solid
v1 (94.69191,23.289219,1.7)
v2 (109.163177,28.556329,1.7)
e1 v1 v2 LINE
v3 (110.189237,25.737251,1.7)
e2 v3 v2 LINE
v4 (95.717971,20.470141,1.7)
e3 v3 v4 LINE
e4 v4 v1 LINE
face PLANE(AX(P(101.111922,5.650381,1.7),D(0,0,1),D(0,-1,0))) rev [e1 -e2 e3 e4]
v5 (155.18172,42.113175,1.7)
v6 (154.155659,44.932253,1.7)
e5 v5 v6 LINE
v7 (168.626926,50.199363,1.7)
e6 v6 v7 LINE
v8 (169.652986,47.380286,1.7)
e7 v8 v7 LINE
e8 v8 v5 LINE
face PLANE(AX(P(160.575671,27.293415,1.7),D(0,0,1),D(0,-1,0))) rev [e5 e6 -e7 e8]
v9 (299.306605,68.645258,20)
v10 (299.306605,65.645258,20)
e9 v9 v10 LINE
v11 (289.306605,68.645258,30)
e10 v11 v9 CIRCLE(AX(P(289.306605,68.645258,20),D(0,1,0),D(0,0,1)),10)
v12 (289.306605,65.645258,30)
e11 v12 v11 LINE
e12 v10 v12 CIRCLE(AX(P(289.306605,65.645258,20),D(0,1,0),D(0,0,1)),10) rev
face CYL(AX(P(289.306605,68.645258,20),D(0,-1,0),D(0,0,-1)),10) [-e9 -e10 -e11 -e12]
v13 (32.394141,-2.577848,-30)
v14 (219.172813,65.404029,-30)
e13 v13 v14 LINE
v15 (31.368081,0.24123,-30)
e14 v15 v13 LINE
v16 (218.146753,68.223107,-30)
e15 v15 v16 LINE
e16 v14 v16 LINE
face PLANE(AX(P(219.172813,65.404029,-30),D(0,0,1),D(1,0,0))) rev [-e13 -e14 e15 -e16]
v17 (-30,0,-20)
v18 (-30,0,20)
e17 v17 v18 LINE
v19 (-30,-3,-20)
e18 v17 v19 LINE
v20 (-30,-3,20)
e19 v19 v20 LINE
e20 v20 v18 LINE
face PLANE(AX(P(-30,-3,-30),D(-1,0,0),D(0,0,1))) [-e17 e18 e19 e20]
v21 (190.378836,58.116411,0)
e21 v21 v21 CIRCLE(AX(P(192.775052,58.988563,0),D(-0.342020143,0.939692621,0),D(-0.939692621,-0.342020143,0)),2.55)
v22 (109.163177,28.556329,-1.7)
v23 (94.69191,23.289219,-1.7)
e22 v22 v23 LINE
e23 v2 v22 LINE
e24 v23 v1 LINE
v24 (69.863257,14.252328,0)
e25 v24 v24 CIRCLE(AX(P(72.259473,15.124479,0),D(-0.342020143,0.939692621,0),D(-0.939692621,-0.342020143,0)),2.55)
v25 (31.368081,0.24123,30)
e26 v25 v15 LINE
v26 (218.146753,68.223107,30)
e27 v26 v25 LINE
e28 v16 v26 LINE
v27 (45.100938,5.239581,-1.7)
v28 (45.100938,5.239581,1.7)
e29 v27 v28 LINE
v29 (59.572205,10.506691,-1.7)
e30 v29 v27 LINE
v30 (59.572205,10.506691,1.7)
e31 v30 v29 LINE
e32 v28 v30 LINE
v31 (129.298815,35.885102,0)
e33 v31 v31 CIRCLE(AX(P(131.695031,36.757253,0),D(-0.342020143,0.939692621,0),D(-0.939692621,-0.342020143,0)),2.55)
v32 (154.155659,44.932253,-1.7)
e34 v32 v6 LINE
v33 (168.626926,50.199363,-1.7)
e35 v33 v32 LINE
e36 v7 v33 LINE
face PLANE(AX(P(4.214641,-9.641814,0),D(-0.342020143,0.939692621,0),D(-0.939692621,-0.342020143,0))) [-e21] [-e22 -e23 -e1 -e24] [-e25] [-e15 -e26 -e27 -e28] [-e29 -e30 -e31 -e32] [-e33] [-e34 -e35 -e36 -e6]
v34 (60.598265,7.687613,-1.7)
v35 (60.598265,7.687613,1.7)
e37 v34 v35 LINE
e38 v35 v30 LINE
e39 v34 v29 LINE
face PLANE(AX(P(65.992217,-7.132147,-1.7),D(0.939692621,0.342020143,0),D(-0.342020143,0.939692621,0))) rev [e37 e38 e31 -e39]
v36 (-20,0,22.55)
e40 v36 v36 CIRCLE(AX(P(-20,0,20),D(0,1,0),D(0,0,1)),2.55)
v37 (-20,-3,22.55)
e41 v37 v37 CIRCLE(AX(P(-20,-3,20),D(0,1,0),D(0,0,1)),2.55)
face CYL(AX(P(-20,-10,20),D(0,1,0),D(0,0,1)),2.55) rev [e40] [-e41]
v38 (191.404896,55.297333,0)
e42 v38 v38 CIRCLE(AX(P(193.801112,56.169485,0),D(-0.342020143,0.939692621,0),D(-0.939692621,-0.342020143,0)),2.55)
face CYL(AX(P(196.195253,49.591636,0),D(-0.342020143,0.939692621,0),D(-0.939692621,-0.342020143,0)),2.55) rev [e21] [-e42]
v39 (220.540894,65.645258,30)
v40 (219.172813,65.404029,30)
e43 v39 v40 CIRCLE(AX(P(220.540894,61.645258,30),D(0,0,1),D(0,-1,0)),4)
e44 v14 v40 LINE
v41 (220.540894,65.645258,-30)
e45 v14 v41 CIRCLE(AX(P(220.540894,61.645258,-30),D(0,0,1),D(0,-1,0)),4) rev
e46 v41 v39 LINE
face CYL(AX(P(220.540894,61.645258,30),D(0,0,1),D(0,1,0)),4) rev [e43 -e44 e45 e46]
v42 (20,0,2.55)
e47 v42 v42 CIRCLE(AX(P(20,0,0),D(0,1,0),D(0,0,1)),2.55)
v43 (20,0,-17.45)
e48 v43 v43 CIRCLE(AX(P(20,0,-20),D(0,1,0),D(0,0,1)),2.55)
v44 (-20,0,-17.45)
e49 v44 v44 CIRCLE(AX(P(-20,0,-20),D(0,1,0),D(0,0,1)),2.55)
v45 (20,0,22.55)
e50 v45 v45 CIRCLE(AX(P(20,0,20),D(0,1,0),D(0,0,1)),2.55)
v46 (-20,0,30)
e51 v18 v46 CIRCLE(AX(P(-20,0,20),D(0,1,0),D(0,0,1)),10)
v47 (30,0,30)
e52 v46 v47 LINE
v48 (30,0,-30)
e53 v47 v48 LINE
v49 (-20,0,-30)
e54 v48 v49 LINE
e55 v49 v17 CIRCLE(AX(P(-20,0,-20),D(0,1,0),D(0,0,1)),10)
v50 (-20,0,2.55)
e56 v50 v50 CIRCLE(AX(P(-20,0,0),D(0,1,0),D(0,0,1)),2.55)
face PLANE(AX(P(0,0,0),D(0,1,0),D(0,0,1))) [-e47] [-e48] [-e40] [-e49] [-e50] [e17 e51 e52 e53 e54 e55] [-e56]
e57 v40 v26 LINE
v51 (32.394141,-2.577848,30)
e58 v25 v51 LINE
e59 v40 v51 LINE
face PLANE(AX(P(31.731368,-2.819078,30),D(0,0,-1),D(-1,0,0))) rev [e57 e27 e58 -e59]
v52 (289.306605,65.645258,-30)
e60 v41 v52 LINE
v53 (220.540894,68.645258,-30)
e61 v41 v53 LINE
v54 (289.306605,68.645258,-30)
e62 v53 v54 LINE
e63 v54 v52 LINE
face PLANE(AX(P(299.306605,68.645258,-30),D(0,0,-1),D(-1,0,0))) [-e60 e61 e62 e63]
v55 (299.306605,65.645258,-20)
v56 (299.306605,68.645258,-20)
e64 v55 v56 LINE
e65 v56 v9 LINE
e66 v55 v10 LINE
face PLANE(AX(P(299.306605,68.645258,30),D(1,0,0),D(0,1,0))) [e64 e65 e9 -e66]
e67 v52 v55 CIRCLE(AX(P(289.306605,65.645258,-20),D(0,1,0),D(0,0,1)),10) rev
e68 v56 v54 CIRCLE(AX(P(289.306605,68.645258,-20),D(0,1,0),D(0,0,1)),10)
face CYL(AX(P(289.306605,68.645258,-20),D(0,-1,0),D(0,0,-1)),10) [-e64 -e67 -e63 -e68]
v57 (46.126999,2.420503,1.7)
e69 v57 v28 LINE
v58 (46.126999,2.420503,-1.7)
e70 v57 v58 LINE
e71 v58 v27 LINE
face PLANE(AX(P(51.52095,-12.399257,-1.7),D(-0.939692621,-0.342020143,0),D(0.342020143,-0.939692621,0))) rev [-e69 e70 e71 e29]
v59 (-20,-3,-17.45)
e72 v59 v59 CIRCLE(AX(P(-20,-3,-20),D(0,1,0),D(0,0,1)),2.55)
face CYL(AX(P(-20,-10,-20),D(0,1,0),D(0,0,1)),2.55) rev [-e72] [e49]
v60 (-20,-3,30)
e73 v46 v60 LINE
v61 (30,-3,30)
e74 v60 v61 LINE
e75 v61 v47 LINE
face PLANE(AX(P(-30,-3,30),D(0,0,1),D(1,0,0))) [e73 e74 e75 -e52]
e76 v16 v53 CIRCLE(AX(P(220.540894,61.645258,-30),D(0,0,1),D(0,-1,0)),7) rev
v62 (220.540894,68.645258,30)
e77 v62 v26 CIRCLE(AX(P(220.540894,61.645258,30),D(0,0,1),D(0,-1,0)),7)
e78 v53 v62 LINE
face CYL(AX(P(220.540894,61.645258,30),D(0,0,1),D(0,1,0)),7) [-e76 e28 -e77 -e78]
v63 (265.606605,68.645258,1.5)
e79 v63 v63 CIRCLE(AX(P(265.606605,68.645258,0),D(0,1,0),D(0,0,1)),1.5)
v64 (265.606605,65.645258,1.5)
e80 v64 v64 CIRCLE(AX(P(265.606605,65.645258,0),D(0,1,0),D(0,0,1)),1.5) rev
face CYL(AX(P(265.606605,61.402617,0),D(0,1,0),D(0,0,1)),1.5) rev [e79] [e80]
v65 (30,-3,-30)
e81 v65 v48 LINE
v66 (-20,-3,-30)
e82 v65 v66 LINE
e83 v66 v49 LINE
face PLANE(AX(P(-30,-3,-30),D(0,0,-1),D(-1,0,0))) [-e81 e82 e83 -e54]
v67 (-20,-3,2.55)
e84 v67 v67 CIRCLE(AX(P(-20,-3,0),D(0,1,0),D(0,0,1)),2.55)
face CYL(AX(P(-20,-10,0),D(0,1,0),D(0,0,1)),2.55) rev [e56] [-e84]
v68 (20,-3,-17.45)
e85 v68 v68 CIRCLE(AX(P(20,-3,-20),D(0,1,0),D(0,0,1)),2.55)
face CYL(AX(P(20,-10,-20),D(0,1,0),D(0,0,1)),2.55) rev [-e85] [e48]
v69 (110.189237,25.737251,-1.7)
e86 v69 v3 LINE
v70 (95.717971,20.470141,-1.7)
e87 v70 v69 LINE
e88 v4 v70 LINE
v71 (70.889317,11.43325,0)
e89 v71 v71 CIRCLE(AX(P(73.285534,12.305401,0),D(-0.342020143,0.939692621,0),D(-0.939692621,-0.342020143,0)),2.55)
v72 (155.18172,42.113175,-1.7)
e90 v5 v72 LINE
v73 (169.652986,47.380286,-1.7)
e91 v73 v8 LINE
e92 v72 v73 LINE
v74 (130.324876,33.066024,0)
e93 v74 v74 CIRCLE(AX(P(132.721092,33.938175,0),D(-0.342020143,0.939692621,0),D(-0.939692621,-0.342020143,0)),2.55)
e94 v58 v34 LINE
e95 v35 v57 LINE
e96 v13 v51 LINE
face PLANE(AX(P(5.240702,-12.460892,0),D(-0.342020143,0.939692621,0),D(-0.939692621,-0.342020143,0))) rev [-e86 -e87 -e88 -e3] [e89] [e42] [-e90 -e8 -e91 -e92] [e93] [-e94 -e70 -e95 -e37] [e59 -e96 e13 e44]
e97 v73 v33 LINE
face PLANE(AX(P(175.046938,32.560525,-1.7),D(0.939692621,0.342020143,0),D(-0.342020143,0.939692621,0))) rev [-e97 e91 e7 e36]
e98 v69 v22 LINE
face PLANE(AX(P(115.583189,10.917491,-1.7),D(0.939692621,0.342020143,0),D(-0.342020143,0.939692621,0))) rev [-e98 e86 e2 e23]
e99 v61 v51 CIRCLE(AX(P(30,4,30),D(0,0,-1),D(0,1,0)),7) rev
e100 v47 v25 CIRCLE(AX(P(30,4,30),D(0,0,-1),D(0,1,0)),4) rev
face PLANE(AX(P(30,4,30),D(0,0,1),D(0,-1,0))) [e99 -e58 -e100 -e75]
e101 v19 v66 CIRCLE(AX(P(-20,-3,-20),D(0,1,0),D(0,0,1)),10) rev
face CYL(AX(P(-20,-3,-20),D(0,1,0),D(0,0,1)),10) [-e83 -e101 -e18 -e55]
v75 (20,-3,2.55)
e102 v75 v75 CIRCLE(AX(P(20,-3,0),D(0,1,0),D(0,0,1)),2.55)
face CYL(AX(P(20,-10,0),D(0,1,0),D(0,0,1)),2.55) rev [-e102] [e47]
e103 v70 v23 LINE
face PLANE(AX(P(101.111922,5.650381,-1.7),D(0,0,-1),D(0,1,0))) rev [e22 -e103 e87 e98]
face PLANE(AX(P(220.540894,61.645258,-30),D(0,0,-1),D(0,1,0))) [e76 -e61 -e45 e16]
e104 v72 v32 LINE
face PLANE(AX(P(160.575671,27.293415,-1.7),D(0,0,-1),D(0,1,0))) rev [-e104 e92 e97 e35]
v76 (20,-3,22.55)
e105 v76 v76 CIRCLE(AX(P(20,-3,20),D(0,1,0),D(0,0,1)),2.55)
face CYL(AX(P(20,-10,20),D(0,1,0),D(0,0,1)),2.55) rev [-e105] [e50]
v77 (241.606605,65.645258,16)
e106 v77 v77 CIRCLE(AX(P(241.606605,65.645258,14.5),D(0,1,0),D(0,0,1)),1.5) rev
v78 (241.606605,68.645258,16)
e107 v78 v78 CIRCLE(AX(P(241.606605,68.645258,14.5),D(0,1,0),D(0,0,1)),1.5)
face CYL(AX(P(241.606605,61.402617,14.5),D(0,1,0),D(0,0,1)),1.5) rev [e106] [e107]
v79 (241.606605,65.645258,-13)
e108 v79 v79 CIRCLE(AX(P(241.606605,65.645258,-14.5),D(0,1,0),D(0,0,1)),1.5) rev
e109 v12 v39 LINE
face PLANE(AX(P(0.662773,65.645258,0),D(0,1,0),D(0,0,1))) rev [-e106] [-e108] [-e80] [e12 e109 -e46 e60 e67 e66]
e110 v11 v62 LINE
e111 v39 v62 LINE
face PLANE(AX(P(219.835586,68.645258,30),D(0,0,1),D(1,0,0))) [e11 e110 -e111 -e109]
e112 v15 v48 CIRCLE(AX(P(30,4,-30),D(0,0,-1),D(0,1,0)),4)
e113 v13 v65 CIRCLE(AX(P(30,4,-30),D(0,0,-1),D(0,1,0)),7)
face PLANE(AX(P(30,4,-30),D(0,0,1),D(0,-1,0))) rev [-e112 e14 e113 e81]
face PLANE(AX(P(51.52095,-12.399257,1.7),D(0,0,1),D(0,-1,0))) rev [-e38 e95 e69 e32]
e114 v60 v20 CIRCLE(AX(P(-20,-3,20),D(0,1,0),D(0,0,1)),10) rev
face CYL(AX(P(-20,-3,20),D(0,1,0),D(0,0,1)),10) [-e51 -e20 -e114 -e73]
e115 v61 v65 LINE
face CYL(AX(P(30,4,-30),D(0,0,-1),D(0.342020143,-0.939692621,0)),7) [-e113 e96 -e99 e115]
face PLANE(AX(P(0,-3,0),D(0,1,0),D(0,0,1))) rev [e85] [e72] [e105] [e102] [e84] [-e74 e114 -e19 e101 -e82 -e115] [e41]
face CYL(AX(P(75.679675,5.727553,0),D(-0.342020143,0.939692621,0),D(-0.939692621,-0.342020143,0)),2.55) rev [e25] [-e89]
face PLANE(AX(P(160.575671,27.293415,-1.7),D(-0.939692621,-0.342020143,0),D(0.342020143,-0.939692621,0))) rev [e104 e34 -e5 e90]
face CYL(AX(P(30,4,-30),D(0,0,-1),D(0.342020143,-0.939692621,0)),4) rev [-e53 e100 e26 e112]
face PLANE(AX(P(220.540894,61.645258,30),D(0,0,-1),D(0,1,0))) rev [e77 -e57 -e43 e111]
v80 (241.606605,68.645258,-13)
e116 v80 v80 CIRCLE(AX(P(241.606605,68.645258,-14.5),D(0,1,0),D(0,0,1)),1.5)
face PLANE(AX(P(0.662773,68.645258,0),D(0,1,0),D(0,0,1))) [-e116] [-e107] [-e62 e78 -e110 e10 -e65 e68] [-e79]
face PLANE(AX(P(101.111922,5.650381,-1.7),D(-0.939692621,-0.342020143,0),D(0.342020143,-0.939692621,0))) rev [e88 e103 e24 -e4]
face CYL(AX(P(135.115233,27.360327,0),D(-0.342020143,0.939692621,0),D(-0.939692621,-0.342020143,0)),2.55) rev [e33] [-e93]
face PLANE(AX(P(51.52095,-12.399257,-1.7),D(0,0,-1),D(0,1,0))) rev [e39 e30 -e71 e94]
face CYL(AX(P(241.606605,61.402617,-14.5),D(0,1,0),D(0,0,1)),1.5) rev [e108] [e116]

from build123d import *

# Parameters (mm, degrees)
SKETCH1_W          = 60
SKETCH1_H          = 60
BASE_FLANGE1_DEPTH = 3
EDGE_FLANGE1_DEPTH = 60
EDGE_FLANGE2_DEPTH = 60
FILLET1_R          = 10
SKETCH12_R         = 2.55
CUT_EXTRUDE1_DEPTH = 10
CAVITY1_START      = -1.5
CAVITY1_DEPTH      = 3
SKETCH15_W         = 15.4
SKETCH15_H         = 3.400000894
SKETCH15_H_2       = 3.4
CUT_EXTRUDE3_DEPTH = 3
SKETCH16_R         = 1.5
CUT_EXTRUDE4_DEPTH = 3
SKETCH17_R         = 2.55
CUT_EXTRUDE5_DEPTH = 10


# Read off the part's stored shape, not the designer's step: Cavity1
# Sheet-metal steps are written as plain solids
with BuildPart() as part:
    # Sketch1 → Base-Flange1 (new body)
    with BuildSketch(Plane(origin=(0, 0, 0), x_dir=(1, 0, 0), z_dir=(0, 1, 0))):
        Rectangle(SKETCH1_W, SKETCH1_H)
    extrude(amount=-BASE_FLANGE1_DEPTH)

    # Edge-Flange1 section (across the edge) → Edge-Flange1 (add)
    with BuildSketch(Plane(origin=(30.705307923, 0, 30), x_dir=(-0.3420201433256631, 0.9396926207859105, 0), z_dir=(0, 0, -1))):
        with BuildLine():
            Line((-3, 0.705307923), (-3, 199.471019058))
            Line((-3, 199.471019058), (0, 199.471019058))
            Line((0, 199.471019058), (0, 0.705307923))
            ThreePointArc((0, 0.705307923), (0.060768988, 0.010715212), (0.241229517, -0.66277265))
            Line((0.241229517, -0.66277265), (-2.577848346, -1.68883308))
            ThreePointArc((-2.577848346, -1.68883308), (-2.893654271, -0.510229321), (-3, 0.705307923))
        make_face()
    extrude(amount=EDGE_FLANGE1_DEPTH)

    # Edge-Flange2 section (across the edge) → Edge-Flange2 (add)
    with BuildSketch(Plane(origin=(219.835585673, 65.645258182, -30), x_dir=(0, -1, 0), z_dir=(0, 0, 1))):
        with BuildLine():
            Line((-3, 0.705307923), (-3, 79.471019058))
            Line((-3, 79.471019058), (0, 79.471019058))
            Line((0, 79.471019058), (0, 0.705307923))
            ThreePointArc((0, 0.705307923), (0.060768988, 0.010715212), (0.241229517, -0.66277265))
            Line((0.241229517, -0.66277265), (-2.577848346, -1.68883308))
            ThreePointArc((-2.577848346, -1.68883308), (-2.893654271, -0.510229321), (-3, 0.705307923))
        make_face()
    extrude(amount=EDGE_FLANGE2_DEPTH)

    # Fillet1
    fillet1_edges = [part.edges().sort_by_distance(p)[0] for p in [
        (299.30660473, 67.145258182, -30),
        (299.30660473, 67.145258182, 30),
        (-30, -1.5, 30),
        (-30, -1.5, -30),
    ]]
    fillet(fillet1_edges, radius=FILLET1_R)

    # Sketch12 → Cut-Extrude1 (cut)
    with BuildSketch(Plane(origin=(0, 0, 0), x_dir=(1, 0, 0), z_dir=(0, 1, 0))):
        with Locations(Location((20, 20, 0), (0, 0, 270))):
            Circle(SKETCH12_R)
        with Locations(Location((20, -20, 0), (0, 0, 270))):
            Circle(SKETCH12_R)
        with Locations(Location((-20, -20, 0), (0, 0, 270))):
            Circle(SKETCH12_R)
        with Locations(Location((-20, 20, 0), (0, 0, 270))):
            Circle(SKETCH12_R)
        with Locations(Location((-20, 0, 0), (0, 0, 270))):
            Circle(SKETCH12_R)
        with Locations(Location((20, 0, 0), (0, 0, 270))):
            Circle(SKETCH12_R)
    extrude(amount=-CUT_EXTRUDE1_DEPTH, mode=Mode.SUBTRACT)

    # Cavity1 outline → Cavity1 (cut)
    with BuildSketch(Plane.XY.offset(CAVITY1_START)):
        with BuildLine():
            ThreePointArc((167.585662257, 46.627841316), (168.714237544, 47.661990034), (168.781007212, 49.191266844))
            Line((168.781007212, 49.191266844), (168.438987069, 50.130959465))
            Line((168.438987069, 50.130959465), (154.343597757, 45.000657315))
            Line((154.343597757, 45.000657315), (154.6856179, 44.060964694))
            ThreePointArc((154.6856179, 44.060964694), (155.719766618, 42.932389407), (157.249043428, 42.865619739))
            Line((157.249043428, 42.865619739), (167.585662257, 46.627841316))
        make_face()
        with BuildLine():
            Line((109.317258169, 27.548232175), (108.975238025, 28.487924795))
            Line((108.975238025, 28.487924795), (94.879848713, 23.357622645))
            Line((94.879848713, 23.357622645), (95.221868857, 22.417930025))
            ThreePointArc((95.221868857, 22.417930025), (96.256017575, 21.289354737), (97.785294385, 21.22258507))
            Line((97.785294385, 21.22258507), (108.121913214, 24.984806646))
            ThreePointArc((108.121913214, 24.984806646), (109.250488501, 26.018955365), (109.317258169, 27.548232175))
        make_face()
        with BuildLine():
            Line((59.726286316, 9.498594532), (59.384266173, 10.438287153))
            Line((59.384266173, 10.438287153), (45.288876861, 5.307985003))
            Line((45.288876861, 5.307985003), (45.630897004, 4.368292382))
            ThreePointArc((45.630897004, 4.368292382), (46.665045723, 3.239717095), (48.194322533, 3.172947427))
            Line((48.194322533, 3.172947427), (58.530941361, 6.935169004))
            ThreePointArc((58.530941361, 6.935169004), (59.659516649, 7.969317722), (59.726286316, 9.498594532))
        make_face()
    extrude(amount=CAVITY1_DEPTH, mode=Mode.SUBTRACT)

    # Sketch15 → Cut-Extrude3 (cut)
    with BuildSketch(Plane(origin=(3.591838707, -9.868495742, 0), x_dir=(0.9396926207859104, 0.34202014332566316, 0), z_dir=(-0.34202014332566316, 0.9396926207859104, 0))):
        with Locations((104.646671142, 0)):
            Rectangle(SKETCH15_W, SKETCH15_H)
        with Locations((51.873061181, 0)):
            Rectangle(SKETCH15_W, SKETCH15_H)
        with Locations((167.926671142, 0)):
            Rectangle(SKETCH15_W, SKETCH15_H_2)
    extrude(amount=-CUT_EXTRUDE3_DEPTH, mode=Mode.SUBTRACT)

    # Sketch16 → Cut-Extrude4 (cut)
    with BuildSketch(Plane(origin=(0, 68.645258182, 0), x_dir=(1, 0, 0), z_dir=(0, 1, 0))):
        with Locations(Location((265.60660473, 0, 0), (0, 0, 270))):
            Circle(SKETCH16_R)
        with Locations(Location((241.60660473, 14.5, 0), (0, 0, 270))):
            Circle(SKETCH16_R)
        with Locations(Location((241.60660473, -14.5, 0), (0, 0, 270))):
            Circle(SKETCH16_R)
    extrude(amount=-CUT_EXTRUDE4_DEPTH, mode=Mode.SUBTRACT)

    # Sketch17 → Cut-Extrude5 (cut)
    with BuildSketch(Plane(origin=(3.591838707, -9.868495742, 0), x_dir=(0.9396926207859104, 0.34202014332566316, 0), z_dir=(-0.34202014332566316, 0.9396926207859104, 0))):
        with Locations(Location((136.324570332, 0, 0), (0, 0, 180))):
            Circle(SKETCH17_R)
        with Locations(Location((201.324570332, 0, 0), (0, 0, 180))):
            Circle(SKETCH17_R)
        with Locations(Location((73.074570332, 0, 0), (0, 0, 180))):
            Circle(SKETCH17_R)
    extrude(amount=-CUT_EXTRUDE5_DEPTH, mode=Mode.SUBTRACT)


solid = part.part
